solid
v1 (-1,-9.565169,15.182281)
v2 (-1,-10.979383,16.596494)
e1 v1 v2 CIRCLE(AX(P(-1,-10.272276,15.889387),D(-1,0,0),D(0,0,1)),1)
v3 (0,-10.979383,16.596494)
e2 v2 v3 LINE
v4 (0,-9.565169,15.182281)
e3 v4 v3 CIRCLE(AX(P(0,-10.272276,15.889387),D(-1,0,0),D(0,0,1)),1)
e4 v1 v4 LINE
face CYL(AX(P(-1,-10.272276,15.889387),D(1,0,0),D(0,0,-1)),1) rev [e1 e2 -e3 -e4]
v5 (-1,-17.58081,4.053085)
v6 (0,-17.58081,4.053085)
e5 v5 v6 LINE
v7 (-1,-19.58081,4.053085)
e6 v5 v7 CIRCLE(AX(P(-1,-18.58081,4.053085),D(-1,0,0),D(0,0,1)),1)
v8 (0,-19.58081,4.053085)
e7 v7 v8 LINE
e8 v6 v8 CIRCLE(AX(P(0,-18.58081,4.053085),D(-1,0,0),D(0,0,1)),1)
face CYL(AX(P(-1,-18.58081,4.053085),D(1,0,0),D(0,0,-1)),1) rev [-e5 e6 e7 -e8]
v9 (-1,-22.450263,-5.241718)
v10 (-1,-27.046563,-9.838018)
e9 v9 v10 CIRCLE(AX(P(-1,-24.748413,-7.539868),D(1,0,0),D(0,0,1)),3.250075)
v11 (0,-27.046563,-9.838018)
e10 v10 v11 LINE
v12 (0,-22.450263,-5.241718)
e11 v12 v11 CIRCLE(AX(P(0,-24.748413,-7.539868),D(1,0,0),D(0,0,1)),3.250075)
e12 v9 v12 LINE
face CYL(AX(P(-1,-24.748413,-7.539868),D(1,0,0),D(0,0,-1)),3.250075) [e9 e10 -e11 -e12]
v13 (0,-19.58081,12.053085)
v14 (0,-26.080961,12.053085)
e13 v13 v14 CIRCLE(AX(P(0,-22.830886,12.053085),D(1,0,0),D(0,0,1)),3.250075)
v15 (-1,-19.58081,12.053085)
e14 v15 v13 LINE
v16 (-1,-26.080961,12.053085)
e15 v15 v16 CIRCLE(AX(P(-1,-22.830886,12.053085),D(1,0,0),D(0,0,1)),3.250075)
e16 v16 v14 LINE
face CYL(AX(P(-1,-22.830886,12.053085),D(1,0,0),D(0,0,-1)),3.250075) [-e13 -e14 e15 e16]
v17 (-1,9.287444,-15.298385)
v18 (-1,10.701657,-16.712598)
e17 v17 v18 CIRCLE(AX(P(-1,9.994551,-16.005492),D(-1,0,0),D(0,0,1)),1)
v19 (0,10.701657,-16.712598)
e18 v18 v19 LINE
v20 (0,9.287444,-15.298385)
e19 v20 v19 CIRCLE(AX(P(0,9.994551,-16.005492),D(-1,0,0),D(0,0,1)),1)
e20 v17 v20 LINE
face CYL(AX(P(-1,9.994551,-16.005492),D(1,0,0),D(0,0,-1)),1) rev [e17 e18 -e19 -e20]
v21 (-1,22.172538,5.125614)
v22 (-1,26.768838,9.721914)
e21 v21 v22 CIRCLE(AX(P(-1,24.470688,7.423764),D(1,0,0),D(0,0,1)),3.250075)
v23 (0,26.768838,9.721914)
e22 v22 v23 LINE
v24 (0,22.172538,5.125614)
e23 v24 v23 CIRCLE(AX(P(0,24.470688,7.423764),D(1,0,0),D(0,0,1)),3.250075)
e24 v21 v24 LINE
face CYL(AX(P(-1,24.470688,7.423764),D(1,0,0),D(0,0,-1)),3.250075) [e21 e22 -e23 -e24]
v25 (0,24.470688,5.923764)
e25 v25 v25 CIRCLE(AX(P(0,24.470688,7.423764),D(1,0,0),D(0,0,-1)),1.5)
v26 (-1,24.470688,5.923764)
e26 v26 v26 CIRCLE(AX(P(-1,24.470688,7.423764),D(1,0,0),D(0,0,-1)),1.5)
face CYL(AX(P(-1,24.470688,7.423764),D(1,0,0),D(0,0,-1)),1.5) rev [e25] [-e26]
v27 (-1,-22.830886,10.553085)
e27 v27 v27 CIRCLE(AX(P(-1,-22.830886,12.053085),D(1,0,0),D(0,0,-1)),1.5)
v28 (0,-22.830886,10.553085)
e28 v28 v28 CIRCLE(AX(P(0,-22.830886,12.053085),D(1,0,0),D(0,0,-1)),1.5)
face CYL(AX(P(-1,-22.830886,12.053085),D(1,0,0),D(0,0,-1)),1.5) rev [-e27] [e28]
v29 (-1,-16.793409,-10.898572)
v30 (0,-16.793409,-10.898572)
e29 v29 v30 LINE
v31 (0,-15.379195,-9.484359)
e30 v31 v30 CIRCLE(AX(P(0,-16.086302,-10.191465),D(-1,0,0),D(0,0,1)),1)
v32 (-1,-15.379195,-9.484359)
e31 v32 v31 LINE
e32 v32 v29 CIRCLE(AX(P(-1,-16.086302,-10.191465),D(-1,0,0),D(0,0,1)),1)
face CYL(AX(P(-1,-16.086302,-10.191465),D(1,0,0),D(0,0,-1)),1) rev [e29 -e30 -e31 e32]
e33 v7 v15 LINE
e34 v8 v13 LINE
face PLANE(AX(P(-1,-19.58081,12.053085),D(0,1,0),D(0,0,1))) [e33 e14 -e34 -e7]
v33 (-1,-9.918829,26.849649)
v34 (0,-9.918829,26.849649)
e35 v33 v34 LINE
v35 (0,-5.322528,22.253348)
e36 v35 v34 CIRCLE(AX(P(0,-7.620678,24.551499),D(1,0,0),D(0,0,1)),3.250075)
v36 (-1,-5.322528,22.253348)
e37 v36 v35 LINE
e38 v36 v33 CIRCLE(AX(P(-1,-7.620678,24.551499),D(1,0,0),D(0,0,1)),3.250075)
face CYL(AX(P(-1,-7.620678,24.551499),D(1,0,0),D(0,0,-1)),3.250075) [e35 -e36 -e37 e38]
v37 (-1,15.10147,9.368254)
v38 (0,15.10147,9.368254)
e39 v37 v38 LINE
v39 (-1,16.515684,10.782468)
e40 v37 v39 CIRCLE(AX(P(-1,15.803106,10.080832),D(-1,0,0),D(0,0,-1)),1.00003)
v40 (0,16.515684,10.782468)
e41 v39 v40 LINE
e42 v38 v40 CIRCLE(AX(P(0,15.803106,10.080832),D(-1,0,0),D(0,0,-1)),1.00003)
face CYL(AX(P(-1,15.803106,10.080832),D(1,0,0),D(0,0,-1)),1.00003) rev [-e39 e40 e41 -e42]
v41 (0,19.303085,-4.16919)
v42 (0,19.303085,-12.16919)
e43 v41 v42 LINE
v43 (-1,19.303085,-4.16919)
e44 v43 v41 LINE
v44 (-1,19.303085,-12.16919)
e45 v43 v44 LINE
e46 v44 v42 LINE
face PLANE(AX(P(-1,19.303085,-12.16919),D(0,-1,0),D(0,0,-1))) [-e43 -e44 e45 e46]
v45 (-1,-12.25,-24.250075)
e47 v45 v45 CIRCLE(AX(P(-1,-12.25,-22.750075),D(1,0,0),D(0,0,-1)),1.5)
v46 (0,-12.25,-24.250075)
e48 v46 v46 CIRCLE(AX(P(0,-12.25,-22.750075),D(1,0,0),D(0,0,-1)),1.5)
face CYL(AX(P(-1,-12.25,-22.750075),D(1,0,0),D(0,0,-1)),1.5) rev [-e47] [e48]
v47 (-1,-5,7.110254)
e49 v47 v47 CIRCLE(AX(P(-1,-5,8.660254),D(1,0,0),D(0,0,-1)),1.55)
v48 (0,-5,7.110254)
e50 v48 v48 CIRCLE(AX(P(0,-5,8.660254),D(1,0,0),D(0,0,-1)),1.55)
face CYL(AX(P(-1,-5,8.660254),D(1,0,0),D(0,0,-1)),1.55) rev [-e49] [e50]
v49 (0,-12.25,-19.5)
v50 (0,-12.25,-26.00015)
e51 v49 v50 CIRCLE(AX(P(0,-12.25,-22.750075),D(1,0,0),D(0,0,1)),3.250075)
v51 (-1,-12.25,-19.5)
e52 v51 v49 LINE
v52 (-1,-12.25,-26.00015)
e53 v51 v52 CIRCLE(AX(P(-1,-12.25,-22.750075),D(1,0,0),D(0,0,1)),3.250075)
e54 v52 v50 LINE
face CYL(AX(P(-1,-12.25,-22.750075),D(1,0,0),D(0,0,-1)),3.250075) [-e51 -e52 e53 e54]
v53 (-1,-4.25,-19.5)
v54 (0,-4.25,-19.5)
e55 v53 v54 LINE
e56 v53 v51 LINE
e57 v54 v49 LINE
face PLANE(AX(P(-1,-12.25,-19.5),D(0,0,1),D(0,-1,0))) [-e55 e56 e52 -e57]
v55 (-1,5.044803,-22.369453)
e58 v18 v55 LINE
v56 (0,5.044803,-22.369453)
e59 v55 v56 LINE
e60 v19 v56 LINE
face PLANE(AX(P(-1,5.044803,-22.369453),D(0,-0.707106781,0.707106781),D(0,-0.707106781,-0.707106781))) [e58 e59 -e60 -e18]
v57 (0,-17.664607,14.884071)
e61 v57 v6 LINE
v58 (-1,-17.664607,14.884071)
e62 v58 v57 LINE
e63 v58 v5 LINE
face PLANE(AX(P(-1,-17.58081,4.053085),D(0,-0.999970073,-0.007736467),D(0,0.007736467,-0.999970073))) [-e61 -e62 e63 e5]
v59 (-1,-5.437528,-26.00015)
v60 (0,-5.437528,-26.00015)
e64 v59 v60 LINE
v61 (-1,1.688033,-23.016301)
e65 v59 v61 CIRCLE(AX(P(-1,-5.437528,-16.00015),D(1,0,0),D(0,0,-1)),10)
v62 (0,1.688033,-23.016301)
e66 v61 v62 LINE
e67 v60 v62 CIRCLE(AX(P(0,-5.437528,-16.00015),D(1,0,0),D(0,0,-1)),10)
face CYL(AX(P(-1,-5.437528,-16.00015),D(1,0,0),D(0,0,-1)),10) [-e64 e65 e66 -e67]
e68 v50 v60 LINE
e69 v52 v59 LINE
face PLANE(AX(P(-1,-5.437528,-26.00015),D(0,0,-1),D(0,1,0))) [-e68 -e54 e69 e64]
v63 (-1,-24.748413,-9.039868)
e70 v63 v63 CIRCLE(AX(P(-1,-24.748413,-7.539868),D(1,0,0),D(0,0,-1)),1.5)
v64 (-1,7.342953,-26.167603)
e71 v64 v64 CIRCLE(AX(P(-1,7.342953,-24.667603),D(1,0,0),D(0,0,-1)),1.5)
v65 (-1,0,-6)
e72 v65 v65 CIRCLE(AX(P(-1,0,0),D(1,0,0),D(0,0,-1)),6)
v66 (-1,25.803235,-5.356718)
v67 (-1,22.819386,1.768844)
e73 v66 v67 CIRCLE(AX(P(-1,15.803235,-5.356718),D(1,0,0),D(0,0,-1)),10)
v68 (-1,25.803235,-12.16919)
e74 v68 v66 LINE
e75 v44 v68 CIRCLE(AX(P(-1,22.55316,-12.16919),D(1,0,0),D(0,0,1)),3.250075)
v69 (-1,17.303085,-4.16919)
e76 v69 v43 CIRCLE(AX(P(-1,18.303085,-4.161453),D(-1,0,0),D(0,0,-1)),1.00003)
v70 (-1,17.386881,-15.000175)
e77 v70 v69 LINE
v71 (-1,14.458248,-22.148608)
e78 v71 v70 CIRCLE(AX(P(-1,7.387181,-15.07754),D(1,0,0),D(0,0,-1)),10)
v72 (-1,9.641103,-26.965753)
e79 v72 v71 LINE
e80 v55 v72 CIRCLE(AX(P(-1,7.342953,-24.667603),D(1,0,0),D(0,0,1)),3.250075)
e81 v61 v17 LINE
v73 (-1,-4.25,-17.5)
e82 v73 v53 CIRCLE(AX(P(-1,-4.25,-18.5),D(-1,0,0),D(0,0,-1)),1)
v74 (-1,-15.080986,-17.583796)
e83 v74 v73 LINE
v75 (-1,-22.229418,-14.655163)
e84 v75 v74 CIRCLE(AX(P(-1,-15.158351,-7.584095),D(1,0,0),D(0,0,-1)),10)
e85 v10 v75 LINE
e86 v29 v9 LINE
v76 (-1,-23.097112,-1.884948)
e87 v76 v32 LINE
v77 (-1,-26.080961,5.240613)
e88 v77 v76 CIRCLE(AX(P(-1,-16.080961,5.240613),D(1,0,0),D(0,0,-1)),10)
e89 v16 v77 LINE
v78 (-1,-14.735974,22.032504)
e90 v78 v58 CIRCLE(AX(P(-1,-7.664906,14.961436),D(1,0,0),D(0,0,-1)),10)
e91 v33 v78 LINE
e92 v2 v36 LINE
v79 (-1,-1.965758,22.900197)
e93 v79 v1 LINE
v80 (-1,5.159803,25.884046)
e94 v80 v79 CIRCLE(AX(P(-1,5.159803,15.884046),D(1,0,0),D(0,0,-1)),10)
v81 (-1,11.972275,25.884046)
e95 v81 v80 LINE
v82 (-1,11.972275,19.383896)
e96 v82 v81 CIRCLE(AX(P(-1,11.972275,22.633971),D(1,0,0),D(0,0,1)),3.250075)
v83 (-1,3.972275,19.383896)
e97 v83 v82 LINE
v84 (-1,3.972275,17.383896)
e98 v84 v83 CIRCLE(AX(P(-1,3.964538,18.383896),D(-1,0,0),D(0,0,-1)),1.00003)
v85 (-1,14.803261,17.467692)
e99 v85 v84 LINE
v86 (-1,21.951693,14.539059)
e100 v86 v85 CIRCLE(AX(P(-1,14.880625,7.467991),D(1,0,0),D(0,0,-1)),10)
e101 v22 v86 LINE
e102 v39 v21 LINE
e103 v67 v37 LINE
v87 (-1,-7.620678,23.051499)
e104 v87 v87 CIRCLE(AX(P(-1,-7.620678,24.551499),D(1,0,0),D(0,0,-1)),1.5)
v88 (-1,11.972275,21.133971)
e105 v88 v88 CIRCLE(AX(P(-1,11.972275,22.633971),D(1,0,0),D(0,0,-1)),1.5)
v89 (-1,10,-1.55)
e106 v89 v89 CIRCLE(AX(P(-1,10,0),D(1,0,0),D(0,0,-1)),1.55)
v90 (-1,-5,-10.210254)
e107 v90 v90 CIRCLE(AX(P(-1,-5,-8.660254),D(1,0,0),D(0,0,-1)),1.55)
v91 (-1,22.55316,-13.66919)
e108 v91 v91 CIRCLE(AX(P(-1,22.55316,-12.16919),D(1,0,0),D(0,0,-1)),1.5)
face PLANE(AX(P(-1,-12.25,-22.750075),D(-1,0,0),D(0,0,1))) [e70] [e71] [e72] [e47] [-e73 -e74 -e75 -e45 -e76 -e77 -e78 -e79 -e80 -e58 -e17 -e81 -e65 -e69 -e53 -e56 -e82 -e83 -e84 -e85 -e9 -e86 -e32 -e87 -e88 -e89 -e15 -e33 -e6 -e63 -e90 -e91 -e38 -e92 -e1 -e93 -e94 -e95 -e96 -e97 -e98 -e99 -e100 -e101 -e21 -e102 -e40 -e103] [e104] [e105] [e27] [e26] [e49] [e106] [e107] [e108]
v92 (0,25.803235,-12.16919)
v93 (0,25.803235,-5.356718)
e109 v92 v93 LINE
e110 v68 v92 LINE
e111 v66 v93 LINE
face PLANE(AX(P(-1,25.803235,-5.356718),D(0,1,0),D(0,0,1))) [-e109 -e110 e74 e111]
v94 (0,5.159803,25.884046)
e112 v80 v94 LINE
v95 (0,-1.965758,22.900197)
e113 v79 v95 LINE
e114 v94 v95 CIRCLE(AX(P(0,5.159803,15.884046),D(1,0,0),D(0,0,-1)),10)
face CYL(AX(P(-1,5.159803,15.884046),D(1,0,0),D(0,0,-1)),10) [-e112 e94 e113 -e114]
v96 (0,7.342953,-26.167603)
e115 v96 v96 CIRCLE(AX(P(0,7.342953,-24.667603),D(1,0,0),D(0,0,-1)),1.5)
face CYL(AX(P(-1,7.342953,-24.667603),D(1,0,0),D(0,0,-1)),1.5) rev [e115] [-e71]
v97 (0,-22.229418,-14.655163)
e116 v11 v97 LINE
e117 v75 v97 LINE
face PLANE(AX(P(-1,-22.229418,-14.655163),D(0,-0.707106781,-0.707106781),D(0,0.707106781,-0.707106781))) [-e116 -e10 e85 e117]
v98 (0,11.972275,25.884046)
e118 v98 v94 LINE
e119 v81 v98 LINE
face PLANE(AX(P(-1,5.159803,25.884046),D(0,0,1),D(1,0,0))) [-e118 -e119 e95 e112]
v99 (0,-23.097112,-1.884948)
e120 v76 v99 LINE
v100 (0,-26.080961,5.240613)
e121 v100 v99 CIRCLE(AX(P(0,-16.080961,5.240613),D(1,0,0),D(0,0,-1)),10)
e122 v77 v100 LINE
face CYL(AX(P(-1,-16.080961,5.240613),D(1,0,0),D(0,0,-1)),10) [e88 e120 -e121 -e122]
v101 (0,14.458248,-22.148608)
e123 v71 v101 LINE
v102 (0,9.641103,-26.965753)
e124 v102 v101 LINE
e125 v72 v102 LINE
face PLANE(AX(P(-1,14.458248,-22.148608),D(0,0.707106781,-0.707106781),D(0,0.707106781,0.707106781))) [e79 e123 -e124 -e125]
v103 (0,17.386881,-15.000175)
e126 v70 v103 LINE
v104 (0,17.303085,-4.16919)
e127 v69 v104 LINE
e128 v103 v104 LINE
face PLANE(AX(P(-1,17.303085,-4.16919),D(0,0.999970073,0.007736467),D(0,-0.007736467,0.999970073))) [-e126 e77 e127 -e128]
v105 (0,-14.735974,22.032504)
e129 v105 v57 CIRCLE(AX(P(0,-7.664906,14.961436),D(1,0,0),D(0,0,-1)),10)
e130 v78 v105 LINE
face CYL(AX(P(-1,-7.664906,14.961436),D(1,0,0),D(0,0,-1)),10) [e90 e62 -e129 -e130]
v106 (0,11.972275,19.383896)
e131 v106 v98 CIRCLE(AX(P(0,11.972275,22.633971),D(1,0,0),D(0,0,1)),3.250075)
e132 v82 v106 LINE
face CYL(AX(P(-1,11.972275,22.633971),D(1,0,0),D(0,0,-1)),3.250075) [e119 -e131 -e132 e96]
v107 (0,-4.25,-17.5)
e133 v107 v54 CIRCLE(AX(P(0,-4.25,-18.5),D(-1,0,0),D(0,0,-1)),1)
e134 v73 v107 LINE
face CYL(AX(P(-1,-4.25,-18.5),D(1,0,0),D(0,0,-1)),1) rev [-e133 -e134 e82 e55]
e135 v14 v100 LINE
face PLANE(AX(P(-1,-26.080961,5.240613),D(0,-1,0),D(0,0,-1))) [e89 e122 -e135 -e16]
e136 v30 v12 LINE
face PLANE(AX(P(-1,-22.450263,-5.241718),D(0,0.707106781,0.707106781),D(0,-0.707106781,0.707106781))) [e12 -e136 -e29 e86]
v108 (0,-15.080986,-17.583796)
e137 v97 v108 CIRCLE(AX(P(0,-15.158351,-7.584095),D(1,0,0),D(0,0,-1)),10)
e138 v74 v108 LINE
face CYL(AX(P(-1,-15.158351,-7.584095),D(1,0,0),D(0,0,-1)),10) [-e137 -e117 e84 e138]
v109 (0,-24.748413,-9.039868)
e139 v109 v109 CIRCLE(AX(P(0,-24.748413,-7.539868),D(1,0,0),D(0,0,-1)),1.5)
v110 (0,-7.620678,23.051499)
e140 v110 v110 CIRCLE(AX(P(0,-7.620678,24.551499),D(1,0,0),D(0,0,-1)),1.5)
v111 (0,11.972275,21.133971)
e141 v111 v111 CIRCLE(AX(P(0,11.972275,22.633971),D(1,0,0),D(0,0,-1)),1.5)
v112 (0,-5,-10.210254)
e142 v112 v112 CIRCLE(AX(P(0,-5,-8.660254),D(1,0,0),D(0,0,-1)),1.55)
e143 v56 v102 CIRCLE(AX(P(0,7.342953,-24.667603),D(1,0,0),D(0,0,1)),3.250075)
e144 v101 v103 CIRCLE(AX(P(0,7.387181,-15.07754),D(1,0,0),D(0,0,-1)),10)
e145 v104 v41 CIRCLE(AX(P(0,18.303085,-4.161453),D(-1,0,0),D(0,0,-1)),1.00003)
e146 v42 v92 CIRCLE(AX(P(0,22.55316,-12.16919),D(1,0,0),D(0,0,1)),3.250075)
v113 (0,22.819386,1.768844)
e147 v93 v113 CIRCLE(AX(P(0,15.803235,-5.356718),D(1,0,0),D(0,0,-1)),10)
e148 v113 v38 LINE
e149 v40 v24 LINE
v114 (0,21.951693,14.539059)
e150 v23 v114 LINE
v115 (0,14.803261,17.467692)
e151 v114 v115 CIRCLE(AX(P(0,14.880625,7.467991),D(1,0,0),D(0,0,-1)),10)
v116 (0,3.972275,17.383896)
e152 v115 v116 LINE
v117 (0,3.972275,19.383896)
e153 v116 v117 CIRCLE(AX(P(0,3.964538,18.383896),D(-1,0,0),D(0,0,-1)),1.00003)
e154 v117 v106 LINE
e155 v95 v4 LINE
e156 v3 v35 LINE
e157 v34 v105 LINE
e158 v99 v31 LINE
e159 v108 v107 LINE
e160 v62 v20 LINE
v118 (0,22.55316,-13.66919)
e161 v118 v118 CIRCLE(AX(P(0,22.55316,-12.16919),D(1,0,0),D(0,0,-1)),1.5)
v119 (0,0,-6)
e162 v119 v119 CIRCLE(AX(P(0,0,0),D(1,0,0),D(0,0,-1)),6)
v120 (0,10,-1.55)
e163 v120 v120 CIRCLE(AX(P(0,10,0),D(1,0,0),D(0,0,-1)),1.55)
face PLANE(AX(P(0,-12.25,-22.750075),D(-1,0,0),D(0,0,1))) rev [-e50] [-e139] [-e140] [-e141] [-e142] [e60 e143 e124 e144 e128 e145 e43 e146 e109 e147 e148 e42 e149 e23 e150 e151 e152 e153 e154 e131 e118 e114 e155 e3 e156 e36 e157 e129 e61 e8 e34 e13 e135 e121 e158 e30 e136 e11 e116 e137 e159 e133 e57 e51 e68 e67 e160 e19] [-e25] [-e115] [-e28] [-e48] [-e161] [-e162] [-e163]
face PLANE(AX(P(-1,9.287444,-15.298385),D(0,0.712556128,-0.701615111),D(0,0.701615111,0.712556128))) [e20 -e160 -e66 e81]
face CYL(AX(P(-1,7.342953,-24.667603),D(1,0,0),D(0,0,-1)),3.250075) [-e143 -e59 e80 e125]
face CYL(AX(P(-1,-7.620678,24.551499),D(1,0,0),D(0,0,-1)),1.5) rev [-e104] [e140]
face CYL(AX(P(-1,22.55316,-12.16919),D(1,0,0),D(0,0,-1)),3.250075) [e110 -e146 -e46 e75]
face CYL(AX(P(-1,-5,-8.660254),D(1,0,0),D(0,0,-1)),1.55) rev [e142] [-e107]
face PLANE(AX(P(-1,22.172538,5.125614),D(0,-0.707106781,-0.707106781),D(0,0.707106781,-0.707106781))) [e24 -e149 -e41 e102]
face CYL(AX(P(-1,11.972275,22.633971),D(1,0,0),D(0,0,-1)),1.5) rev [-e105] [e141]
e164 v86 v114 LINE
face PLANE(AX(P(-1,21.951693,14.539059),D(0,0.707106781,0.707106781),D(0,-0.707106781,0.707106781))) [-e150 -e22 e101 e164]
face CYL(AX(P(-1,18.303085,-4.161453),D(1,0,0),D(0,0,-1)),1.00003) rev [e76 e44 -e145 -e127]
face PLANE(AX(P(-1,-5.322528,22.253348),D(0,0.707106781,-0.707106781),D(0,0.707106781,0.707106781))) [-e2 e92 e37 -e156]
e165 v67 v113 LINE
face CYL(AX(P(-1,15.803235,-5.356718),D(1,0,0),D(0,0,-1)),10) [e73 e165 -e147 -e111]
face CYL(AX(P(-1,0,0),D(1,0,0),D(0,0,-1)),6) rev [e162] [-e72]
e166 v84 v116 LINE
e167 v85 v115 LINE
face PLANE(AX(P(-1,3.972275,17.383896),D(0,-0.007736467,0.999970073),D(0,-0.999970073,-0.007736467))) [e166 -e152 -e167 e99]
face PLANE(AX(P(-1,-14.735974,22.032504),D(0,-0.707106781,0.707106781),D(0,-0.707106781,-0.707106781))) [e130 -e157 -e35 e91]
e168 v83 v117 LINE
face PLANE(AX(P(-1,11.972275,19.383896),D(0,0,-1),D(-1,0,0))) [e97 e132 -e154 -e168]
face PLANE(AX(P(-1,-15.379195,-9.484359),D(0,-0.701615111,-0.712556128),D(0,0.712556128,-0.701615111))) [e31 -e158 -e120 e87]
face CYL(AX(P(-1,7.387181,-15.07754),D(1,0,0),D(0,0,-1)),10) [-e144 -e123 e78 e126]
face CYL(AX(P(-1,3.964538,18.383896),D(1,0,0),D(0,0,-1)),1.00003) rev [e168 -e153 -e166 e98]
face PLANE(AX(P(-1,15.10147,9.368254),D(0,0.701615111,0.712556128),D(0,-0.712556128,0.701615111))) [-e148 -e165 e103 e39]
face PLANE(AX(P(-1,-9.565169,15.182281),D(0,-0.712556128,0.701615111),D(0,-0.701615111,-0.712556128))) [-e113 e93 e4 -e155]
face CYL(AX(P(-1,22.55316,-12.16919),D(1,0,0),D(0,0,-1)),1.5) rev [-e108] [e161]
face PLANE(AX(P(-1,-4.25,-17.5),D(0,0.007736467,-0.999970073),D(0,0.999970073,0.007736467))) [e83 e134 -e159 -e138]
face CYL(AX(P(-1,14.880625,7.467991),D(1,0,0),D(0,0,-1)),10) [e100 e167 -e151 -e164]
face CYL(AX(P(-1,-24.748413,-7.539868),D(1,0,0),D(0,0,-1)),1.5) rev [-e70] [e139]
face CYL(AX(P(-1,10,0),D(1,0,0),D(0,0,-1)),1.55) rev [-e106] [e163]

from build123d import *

# Parameters (mm, degrees)
SKETCH1_R          = 1.5
SKETCH1_R_2        = 6
SKETCH1_R_3        = 1.55
BASE_FLANGE1_DEPTH = 1


# Sheet-metal steps are written as plain solids
with BuildPart() as part:
    # Sketch1 → Base-Flange1 (new body)
    with BuildSketch(Plane(origin=(0, 0, 0), x_dir=(0, 0, -1), z_dir=(1, 0, 0))):
        with BuildLine():
            Line((15.298384889, 9.287443872), (23.016301233, 1.688033071))
            ThreePointArc((23.016301233, 1.688033071), (25.224073123, -1.574984432), (26.00015012, -5.437528209))
            Line((26.00015012, -5.437528209), (26.00015012, -12.25))
            ThreePointArc((26.00015012, -12.25), (22.75007506, -15.50007506), (19.5, -12.25))
            Line((19.5, -12.25), (19.5, -4.25))
            ThreePointArc((19.5, -4.25), (18.5, -3.25), (17.5, -4.25))
            Line((17.5, -4.25), (17.583796073, -15.080985895))
            ThreePointArc((17.583796073, -15.080985895), (16.837624745, -18.949418172), (14.655163154, -22.229418377))
            Line((14.655163154, -22.229418377), (9.838018154, -27.046563377))
            ThreePointArc((9.838018154, -27.046563377), (5.241717926, -27.046563377), (5.241717926, -22.450263149))
            Line((5.241717926, -22.450263149), (10.898572175, -16.793408899))
            ThreePointArc((10.898572175, -16.793408899), (10.898572175, -15.379195337), (9.484358613, -15.379195337))
            Line((9.484358613, -15.379195337), (1.884947812, -23.097111681))
            ThreePointArc((1.884947812, -23.097111681), (-1.378069691, -25.304883571), (-5.240613468, -26.080960568))
            Line((-5.240613468, -26.080960568), (-12.053085259, -26.080960568))
            ThreePointArc((-12.053085259, -26.080960568), (-15.303160319, -22.830885508), (-12.053085259, -19.580810448))
            Line((-12.053085259, -19.580810448), (-4.053085259, -19.580810448))
            ThreePointArc((-4.053085259, -19.580810448), (-3.053085259, -18.580810448), (-4.053085259, -17.580810448))
            Line((-4.053085259, -17.580810448), (-14.884071154, -17.664606521))
            ThreePointArc((-14.884071154, -17.664606521), (-18.752503431, -16.918435193), (-22.032503636, -14.735973602))
            Line((-22.032503636, -14.735973602), (-26.849648636, -9.918828602))
            ThreePointArc((-26.849648636, -9.918828602), (-26.849648636, -5.322528374), (-22.253348408, -5.322528374))
            Line((-22.253348408, -5.322528374), (-16.596494158, -10.979382623))
            ThreePointArc((-16.596494158, -10.979382623), (-15.182280596, -10.979382623), (-15.182280596, -9.565169061))
            Line((-15.182280596, -9.565169061), (-22.90019694, -1.96575826))
            ThreePointArc((-22.90019694, -1.96575826), (-25.10796883, 1.297259243), (-25.884045827, 5.15980302))
            Line((-25.884045827, 5.15980302), (-25.884045827, 11.972274811))
            ThreePointArc((-25.884045827, 11.972274811), (-22.633970767, 15.222349871), (-19.383895707, 11.972274811))
            Line((-19.383895707, 11.972274811), (-19.383895707, 3.972274811))
            ThreePointArc((-19.383895707, 3.972274811), (-18.383895707, 2.964508185), (-17.383895707, 3.972274811))
            Line((-17.383895707, 3.972274811), (-17.46769178, 14.803260706))
            ThreePointArc((-17.46769178, 14.803260706), (-16.721520452, 18.671692983), (-14.539058861, 21.951693188))
            Line((-14.539058861, 21.951693188), (-9.721913861, 26.768838188))
            ThreePointArc((-9.721913861, 26.768838188), (-5.125613633, 26.768838188), (-5.125613633, 22.17253796))
            Line((-5.125613633, 22.17253796), (-10.782467882, 16.51568371))
            ThreePointArc((-10.782467882, 16.51568371), (-10.787959717, 15.095978314), (-9.36825432, 15.101470148))
            Line((-9.36825432, 15.101470148), (-1.768843519, 22.819386492))
            ThreePointArc((-1.768843519, 22.819386492), (1.494173984, 25.027158382), (5.356717761, 25.803235379))
            Line((5.356717761, 25.803235379), (12.169189552, 25.803235379))
            ThreePointArc((12.169189552, 25.803235379), (15.419264612, 22.553160319), (12.169189552, 19.303085259))
            Line((12.169189552, 19.303085259), (4.169189552, 19.303085259))
            ThreePointArc((4.169189552, 19.303085259), (3.161422926, 18.303085259), (4.169189552, 17.303085259))
            Line((4.169189552, 17.303085259), (15.000175447, 17.386881332))
            ThreePointArc((15.000175447, 17.386881332), (18.868607724, 16.640710004), (22.148607929, 14.458248413))
            Line((22.148607929, 14.458248413), (26.965752929, 9.641103413))
            ThreePointArc((26.965752929, 9.641103413), (26.965752929, 5.044803185), (22.369452701, 5.044803185))
            Line((22.369452701, 5.044803185), (16.712598451, 10.701657434))
            ThreePointArc((16.712598451, 10.701657434), (15.298384889, 10.701657434), (15.298384889, 9.287443872))
        make_face()
        with Locations((22.75007506, -12.25)):
            Circle(SKETCH1_R, mode=Mode.SUBTRACT)
        with Locations((7.53986804, -24.748413263)):
            Circle(SKETCH1_R, mode=Mode.SUBTRACT)
        with Locations((-12.053085259, -22.830885508)):
            Circle(SKETCH1_R, mode=Mode.SUBTRACT)
        with Locations((-24.551498522, -7.620678488)):
            Circle(SKETCH1_R, mode=Mode.SUBTRACT)
        with Locations((-22.633970767, 11.972274811)):
            Circle(SKETCH1_R, mode=Mode.SUBTRACT)
        with Locations((-7.423763747, 24.470688074)):
            Circle(SKETCH1_R, mode=Mode.SUBTRACT)
        with Locations((12.169189552, 22.553160319)):
            Circle(SKETCH1_R, mode=Mode.SUBTRACT)
        with Locations((24.667602815, 7.342953299)):
            Circle(SKETCH1_R, mode=Mode.SUBTRACT)
        Circle(SKETCH1_R_2, mode=Mode.SUBTRACT)
        with Locations((0, 10)):
            Circle(SKETCH1_R_3, mode=Mode.SUBTRACT)
        with Locations((8.660254038, -5)):
            Circle(SKETCH1_R_3, mode=Mode.SUBTRACT)
        with Locations((-8.660254038, -5)):
            Circle(SKETCH1_R_3, mode=Mode.SUBTRACT)
    extrude(amount=-BASE_FLANGE1_DEPTH)


solid = part.part
